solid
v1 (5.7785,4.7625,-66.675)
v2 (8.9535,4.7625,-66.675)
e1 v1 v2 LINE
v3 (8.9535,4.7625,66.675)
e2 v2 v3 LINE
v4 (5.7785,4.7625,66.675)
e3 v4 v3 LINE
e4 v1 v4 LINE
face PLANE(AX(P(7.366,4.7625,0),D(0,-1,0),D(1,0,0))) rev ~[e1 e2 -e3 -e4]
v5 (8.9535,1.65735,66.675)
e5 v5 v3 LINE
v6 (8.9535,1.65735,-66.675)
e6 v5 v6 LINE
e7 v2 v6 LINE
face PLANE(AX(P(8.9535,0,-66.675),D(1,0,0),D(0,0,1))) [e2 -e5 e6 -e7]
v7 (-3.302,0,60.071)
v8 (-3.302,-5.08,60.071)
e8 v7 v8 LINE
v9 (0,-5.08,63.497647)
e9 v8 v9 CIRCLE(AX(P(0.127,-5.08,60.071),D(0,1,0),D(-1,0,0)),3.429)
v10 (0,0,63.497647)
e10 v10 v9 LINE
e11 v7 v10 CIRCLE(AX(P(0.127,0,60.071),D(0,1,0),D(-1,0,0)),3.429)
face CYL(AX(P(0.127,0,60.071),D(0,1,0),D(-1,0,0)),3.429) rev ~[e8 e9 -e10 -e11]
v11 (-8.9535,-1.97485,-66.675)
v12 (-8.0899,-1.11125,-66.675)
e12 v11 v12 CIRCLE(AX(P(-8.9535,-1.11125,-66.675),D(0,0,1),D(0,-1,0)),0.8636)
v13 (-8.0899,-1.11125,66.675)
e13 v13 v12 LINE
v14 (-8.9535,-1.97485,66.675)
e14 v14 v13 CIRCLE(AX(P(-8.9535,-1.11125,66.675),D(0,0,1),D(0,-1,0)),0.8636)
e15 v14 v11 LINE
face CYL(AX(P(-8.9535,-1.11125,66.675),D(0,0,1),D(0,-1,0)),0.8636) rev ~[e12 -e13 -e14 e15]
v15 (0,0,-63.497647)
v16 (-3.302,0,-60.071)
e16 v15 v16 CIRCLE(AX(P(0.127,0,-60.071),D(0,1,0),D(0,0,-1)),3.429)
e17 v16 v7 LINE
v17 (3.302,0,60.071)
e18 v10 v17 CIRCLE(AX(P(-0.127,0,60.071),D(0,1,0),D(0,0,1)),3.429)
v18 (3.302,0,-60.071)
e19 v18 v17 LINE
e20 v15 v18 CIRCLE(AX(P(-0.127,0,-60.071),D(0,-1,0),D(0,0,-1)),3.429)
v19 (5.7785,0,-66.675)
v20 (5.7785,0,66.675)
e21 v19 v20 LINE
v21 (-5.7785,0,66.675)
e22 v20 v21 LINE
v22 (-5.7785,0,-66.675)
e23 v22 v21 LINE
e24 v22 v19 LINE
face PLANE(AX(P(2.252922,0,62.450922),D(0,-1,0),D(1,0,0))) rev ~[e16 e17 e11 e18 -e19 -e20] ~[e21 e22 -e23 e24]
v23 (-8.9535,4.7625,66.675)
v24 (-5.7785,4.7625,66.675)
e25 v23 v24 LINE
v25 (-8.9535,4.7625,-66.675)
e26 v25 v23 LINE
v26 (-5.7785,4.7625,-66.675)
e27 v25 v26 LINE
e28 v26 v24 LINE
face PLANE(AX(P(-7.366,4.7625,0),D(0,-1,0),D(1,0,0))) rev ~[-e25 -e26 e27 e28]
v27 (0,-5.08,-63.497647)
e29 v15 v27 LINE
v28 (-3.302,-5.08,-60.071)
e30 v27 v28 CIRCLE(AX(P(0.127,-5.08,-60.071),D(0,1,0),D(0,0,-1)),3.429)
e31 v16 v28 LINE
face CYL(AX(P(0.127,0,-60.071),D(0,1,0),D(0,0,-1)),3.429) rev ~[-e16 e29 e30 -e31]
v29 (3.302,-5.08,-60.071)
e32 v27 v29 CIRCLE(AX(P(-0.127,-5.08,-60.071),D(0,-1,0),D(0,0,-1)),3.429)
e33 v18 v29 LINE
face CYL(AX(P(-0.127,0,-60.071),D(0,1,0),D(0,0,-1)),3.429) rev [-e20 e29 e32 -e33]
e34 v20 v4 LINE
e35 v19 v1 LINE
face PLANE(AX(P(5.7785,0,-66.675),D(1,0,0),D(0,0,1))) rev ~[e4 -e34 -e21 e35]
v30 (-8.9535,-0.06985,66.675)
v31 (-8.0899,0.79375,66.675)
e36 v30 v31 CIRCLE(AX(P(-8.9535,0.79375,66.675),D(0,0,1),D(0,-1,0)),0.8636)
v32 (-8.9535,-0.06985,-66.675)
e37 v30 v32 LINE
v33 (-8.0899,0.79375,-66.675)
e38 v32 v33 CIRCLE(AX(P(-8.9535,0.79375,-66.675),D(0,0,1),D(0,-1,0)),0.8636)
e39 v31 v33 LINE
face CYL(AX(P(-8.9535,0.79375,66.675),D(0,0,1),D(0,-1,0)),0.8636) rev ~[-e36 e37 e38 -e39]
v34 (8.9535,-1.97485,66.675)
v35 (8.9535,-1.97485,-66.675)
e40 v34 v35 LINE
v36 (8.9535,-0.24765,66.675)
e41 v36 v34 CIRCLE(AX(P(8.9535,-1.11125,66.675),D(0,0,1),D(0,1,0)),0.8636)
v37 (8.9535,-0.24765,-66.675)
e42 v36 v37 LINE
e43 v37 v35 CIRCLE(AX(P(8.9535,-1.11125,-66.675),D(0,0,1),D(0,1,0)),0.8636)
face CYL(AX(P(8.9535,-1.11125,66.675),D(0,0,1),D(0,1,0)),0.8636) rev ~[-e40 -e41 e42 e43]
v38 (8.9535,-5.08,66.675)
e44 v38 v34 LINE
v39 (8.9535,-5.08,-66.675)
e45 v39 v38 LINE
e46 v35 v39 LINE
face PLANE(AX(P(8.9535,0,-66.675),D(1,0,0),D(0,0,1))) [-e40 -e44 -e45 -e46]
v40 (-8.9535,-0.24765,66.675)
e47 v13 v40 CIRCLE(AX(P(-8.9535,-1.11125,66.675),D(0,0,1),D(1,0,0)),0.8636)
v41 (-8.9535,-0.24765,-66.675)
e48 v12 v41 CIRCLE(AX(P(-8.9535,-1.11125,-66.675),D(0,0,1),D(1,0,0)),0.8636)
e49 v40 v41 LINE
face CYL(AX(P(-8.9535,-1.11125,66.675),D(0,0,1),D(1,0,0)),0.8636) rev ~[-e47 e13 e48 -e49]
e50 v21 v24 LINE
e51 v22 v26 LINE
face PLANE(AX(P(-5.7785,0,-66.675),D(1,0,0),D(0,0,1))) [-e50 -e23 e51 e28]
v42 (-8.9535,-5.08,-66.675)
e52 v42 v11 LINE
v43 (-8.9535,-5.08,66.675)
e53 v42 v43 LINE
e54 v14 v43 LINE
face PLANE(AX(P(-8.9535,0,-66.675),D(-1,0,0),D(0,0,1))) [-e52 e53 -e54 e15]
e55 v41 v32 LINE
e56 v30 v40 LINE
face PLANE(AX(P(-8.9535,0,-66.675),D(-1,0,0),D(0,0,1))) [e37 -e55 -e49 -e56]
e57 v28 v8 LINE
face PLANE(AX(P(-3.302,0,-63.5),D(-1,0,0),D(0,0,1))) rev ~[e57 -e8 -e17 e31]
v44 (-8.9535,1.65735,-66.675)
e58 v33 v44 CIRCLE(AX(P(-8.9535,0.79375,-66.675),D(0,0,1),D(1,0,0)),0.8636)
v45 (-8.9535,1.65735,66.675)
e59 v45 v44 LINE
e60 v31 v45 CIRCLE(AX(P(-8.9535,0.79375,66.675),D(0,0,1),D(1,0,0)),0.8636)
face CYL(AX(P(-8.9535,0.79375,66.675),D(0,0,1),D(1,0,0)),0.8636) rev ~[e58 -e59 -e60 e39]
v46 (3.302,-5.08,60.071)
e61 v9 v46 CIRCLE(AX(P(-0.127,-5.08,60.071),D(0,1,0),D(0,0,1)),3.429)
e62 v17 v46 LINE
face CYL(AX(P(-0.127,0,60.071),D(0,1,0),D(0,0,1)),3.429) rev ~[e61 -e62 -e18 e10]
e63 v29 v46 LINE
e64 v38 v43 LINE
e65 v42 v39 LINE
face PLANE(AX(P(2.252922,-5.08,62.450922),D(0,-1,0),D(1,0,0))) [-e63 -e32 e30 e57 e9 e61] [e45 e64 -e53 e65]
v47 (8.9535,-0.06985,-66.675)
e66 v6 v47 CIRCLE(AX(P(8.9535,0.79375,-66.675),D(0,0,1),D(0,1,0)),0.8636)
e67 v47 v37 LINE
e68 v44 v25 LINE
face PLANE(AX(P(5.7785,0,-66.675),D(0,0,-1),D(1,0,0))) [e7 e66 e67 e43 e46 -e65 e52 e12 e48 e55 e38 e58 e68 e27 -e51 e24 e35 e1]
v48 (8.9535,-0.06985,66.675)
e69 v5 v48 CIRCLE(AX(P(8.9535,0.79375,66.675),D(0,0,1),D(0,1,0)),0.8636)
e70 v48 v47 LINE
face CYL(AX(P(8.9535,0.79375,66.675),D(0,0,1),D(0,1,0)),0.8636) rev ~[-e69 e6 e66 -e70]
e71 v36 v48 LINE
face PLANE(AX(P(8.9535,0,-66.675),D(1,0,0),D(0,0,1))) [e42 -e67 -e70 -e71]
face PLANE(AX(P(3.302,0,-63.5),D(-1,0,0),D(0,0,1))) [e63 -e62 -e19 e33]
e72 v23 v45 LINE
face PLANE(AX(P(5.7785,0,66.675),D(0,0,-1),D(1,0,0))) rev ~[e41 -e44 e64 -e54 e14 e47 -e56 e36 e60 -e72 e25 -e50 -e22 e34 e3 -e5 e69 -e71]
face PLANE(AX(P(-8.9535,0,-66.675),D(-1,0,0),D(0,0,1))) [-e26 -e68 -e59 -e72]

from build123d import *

# Parameters (mm, degrees)
F0_W        = 11.557
F0_H        = 133.35
F0_W_2      = 6.604
F0_H_2      = 127
F0_W_3      = 3.175
F1_DEPTH    = 5.08
F2_T1_DEPTH = 5.08
F3_DEPTH    = 4.7625
F5_DEPTH    = 133.351


# Not quite as in the source:
# - a fillet or chamfer that OpenCascade refuses, or shapes differently, is made with other operations: its cross-section is extruded or revolved along the edge and cut away or added


with BuildPart() as f1:
    # F0 (on Front) → F1 (new body)
    with BuildSketch(Plane.XZ):
        Rectangle(F0_W, F0_H)
        Rectangle(F0_W_2, F0_H_2, mode=Mode.SUBTRACT)
        with Locations((-7.366, 0)):
            Rectangle(F0_W_3, F0_H)
        with Locations((7.366, 0)):
            Rectangle(F0_W_3, F0_H)
    extrude(amount=F1_DEPTH)

    # F2: fillet of radius 3.429 on 4 edges, made by hand

    # F2_s2 → F2_t1 (join)
    with BuildSketch(Plane.XZ):
        with BuildLine():
            ThreePointArc((-0.127, 63.5), (2.2976691527, 62.4956691527), (3.302, 60.071))
            Line((3.302, 60.071), (3.302, 63.5))
            Line((3.302, 63.5), (-0.127, 63.5))
        make_face()
        with BuildLine():
            ThreePointArc((-3.302, 60.071), (-2.2976691527, 62.4956691527), (0.127, 63.5))
            Line((0.127, 63.5), (-3.302, 63.5))
            Line((-3.302, 63.5), (-3.302, 60.071))
        make_face()
        with BuildLine():
            ThreePointArc((0.127, -63.5), (-2.2976691527, -62.4956691527), (-3.302, -60.071))
            Line((-3.302, -60.071), (-3.302, -63.5))
            Line((-3.302, -63.5), (0.127, -63.5))
        make_face()
        with BuildLine():
            ThreePointArc((-0.127, -63.5), (2.2976691527, -62.4956691527), (3.302, -60.071))
            Line((3.302, -60.071), (3.302, -63.5))
            Line((3.302, -63.5), (-0.127, -63.5))
        make_face()
    extrude(amount=F2_T1_DEPTH)

    # F0 (on Front) → F3 (join)
    with BuildSketch(Plane.XZ):
        with Locations((7.366, 0)):
            Rectangle(F0_W_3, F0_H)
        with Locations((-7.366, 0)):
            Rectangle(F0_W_3, F0_H)
    extrude(amount=-F3_DEPTH)

    # F4 (on face) → F5 (cut, through all)
    with BuildSketch(Plane.XY.offset(66.675)):
        with BuildLine():
            ThreePointArc((-8.9535, -0.06985), (-8.3428425838, 0.1830925838), (-8.0899, 0.79375))
            ThreePointArc((-8.0899, 0.79375), (-8.3428425838, 1.4044074162), (-8.9535, 1.65735))
            Line((-8.9535, 1.65735), (-8.9535, -0.06985))
        make_face()
        with BuildLine():
            ThreePointArc((-8.0899, -1.11125), (-8.3428425838, -0.5005925838), (-8.9535, -0.24765))
            Line((-8.9535, -0.24765), (-8.9535, -1.97485))
            ThreePointArc((-8.9535, -1.97485), (-8.3428425838, -1.7219074162), (-8.0899, -1.11125))
        make_face()
        with BuildLine():
            ThreePointArc((8.9535, -0.24765), (8.0899, -1.11125), (8.9535, -1.97485))
            Line((8.9535, -1.97485), (8.9535, -0.24765))
        make_face()
        with BuildLine():
            Line((8.9535, -0.06985), (8.9535, 1.65735))
            ThreePointArc((8.9535, 1.65735), (8.0899, 0.79375), (8.9535, -0.06985))
        make_face()
    extrude(amount=-F5_DEPTH, mode=Mode.SUBTRACT)


solid = f1.part
